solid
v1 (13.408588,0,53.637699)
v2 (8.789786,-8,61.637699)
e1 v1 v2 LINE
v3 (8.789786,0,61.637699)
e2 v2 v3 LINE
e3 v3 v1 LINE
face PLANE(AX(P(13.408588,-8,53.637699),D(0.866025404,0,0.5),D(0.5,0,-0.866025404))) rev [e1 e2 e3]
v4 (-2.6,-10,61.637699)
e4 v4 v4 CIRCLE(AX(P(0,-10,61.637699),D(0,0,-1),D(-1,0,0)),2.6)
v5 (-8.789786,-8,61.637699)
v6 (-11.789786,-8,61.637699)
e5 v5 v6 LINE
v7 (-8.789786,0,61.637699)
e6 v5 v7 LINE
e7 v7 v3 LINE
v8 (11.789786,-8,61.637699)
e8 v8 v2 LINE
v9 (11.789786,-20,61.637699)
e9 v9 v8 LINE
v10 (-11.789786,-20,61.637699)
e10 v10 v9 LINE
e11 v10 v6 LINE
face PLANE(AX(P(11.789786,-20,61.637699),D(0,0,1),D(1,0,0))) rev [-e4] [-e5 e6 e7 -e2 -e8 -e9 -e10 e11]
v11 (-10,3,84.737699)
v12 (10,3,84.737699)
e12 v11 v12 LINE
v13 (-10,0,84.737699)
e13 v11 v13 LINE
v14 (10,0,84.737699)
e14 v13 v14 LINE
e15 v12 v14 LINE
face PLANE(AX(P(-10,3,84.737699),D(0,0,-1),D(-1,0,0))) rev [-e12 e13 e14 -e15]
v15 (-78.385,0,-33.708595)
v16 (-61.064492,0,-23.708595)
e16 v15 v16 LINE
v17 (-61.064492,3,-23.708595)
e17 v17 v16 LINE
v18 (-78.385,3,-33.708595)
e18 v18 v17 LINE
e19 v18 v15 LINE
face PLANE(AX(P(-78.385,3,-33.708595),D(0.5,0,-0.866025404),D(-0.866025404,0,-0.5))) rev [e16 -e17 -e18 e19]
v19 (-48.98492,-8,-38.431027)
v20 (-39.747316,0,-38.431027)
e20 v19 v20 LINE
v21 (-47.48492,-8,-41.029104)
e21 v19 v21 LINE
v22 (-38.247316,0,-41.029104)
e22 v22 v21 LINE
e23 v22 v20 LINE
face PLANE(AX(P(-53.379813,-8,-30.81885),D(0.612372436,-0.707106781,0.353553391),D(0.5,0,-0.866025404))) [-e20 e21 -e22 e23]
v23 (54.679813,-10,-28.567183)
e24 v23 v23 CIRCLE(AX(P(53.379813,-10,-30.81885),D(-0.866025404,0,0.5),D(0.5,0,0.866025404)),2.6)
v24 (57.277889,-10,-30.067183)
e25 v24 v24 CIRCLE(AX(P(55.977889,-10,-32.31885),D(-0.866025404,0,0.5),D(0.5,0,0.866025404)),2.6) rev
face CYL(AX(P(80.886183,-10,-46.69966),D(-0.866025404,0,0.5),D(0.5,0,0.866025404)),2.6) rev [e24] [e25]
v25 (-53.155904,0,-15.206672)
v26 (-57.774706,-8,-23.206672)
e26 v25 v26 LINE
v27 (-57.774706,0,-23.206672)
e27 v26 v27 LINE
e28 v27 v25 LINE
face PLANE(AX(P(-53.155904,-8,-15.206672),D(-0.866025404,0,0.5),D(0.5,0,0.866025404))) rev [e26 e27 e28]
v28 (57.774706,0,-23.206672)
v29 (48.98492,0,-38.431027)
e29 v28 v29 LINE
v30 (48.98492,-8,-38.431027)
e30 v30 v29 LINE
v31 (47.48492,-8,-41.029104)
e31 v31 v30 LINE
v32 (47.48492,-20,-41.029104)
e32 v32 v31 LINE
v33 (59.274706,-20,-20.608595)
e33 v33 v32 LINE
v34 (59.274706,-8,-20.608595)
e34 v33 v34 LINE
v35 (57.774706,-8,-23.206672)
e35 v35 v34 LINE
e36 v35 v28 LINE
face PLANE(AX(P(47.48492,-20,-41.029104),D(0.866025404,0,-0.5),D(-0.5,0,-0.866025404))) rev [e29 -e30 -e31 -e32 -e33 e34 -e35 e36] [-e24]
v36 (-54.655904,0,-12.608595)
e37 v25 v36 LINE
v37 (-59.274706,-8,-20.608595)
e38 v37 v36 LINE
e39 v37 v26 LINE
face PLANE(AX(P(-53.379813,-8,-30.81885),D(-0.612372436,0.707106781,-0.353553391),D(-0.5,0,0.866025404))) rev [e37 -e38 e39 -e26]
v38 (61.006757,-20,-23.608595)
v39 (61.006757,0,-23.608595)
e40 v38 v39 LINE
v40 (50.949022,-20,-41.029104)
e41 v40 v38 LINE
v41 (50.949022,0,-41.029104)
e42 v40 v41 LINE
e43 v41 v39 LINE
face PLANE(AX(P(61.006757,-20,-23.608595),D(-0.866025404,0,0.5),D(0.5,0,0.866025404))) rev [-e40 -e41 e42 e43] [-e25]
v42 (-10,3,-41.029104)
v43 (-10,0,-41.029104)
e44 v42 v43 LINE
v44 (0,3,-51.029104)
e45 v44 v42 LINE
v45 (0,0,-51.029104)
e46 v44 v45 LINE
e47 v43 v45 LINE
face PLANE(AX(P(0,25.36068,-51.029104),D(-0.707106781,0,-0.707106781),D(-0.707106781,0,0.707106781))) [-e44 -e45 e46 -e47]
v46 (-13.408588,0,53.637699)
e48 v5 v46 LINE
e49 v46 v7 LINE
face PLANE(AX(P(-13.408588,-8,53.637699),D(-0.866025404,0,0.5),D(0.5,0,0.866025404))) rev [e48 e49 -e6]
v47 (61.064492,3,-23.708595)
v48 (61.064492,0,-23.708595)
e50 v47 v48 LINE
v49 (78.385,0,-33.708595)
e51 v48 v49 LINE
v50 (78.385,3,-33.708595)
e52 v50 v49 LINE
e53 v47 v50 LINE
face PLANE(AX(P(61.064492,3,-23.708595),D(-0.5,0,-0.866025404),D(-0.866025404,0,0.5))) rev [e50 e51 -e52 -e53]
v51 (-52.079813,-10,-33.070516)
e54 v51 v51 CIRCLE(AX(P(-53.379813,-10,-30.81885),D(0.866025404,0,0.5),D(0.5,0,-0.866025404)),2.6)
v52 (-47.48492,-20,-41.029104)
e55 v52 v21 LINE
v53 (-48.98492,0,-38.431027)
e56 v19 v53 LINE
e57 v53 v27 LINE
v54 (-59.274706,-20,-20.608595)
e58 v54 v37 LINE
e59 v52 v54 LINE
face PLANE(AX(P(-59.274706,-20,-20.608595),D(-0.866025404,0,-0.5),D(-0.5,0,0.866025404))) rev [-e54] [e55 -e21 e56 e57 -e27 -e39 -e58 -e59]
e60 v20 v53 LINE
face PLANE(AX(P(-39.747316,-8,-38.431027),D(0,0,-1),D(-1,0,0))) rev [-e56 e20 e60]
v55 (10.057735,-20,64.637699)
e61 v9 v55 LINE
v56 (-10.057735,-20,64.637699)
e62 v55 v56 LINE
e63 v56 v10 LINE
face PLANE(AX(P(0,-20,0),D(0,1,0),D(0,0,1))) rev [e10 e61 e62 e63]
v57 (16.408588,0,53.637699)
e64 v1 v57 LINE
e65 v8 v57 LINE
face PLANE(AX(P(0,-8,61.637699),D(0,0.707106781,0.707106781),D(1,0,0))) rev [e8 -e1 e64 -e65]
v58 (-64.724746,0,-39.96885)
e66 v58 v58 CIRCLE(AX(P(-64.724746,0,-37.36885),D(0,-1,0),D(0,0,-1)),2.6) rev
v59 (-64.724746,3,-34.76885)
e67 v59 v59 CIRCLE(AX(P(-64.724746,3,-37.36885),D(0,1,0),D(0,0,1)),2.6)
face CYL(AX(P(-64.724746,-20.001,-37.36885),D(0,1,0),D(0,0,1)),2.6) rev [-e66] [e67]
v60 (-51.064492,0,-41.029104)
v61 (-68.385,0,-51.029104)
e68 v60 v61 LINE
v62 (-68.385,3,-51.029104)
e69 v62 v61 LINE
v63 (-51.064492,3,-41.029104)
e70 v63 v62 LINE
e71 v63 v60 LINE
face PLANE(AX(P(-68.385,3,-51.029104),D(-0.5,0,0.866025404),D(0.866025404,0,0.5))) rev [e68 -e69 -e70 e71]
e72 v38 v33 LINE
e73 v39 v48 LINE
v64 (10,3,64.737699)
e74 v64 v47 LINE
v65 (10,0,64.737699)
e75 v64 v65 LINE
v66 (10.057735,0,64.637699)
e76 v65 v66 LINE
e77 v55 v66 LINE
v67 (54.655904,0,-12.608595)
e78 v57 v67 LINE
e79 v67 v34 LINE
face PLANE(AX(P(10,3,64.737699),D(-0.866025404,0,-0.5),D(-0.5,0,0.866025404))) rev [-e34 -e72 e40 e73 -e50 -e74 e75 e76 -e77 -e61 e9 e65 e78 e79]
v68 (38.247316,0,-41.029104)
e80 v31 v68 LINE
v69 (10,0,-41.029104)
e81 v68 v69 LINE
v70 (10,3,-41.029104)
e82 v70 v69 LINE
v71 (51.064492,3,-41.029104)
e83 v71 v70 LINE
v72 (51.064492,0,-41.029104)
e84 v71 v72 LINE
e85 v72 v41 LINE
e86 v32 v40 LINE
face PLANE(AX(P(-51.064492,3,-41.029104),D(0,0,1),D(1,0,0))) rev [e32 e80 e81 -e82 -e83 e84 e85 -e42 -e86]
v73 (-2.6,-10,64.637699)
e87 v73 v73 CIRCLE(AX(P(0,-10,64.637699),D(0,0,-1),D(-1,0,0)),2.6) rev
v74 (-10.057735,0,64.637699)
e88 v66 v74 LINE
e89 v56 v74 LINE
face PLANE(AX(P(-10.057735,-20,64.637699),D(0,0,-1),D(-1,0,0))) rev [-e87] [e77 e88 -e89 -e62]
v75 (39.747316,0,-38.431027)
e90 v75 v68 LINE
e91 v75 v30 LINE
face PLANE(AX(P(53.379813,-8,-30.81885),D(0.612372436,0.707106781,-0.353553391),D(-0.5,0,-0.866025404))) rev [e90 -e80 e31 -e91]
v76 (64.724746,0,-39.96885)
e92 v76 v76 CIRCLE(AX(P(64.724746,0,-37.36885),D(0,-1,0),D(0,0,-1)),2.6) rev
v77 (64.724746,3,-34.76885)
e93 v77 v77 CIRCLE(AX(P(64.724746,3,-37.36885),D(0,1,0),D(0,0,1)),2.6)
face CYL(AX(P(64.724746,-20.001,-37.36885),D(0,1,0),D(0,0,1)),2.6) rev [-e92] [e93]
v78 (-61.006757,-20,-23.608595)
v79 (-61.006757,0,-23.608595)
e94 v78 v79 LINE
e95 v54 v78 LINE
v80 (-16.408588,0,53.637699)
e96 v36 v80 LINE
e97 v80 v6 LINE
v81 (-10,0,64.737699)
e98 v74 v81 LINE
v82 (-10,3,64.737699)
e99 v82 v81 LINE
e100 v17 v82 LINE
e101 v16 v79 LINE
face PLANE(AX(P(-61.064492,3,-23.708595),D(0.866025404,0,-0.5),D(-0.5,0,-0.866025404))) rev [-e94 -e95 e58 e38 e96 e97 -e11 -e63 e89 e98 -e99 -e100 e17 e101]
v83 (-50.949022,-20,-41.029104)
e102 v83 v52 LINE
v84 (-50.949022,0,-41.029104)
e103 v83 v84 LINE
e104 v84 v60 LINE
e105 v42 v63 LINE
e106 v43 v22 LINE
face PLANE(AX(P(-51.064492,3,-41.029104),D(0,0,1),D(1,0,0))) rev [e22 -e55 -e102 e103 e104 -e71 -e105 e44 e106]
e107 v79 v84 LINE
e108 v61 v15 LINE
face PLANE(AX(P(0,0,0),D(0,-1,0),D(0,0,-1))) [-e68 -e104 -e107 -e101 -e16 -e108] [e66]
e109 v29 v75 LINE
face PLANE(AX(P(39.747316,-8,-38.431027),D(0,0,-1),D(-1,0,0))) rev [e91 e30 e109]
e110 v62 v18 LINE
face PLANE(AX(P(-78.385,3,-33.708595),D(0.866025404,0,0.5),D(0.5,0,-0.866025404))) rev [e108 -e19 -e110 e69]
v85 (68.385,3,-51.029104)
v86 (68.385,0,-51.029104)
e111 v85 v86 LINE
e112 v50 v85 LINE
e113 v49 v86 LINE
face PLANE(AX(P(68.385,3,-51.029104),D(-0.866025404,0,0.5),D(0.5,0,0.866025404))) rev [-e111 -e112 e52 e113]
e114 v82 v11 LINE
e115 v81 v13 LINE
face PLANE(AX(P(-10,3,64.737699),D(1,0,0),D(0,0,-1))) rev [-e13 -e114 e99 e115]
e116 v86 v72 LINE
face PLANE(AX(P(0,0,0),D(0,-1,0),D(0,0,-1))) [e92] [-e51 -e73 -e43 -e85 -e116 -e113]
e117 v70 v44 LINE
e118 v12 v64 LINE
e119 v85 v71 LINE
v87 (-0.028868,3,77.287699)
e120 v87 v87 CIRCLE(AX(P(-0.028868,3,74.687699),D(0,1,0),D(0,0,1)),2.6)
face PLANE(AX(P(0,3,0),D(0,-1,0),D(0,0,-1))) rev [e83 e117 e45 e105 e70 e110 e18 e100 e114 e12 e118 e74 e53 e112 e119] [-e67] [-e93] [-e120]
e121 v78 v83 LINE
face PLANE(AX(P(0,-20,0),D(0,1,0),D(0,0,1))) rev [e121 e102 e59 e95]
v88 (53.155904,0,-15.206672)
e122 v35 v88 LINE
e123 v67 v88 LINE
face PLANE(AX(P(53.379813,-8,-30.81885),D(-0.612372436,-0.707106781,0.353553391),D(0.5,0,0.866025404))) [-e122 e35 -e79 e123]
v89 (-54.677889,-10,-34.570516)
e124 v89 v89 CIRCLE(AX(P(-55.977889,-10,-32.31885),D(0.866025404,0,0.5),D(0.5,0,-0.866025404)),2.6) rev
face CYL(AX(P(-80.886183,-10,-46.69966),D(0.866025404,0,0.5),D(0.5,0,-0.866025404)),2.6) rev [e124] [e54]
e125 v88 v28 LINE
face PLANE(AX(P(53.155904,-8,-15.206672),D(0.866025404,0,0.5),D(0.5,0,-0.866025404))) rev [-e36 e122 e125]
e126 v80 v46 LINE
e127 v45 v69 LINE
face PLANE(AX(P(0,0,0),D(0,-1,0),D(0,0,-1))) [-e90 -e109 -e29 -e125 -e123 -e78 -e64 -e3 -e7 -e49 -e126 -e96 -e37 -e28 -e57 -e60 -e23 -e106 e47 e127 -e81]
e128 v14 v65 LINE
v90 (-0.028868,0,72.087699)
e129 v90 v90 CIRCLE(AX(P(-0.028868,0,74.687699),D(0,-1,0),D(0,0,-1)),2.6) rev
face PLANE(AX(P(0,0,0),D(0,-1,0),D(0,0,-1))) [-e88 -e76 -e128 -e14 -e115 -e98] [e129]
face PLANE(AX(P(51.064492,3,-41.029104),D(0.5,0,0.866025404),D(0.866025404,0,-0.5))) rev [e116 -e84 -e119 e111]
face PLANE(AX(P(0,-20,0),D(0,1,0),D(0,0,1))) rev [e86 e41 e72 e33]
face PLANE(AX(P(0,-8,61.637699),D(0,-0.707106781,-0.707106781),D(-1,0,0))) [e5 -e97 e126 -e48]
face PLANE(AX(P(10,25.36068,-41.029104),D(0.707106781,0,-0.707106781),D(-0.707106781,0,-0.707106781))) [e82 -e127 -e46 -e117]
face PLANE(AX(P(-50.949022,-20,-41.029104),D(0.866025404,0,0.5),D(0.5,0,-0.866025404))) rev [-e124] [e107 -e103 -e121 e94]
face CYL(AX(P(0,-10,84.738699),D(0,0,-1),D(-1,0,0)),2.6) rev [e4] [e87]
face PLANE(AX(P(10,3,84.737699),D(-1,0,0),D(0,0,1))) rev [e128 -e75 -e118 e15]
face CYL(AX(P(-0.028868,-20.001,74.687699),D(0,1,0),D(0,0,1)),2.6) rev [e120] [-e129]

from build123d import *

# Parameters (mm, degrees)
AUFSATZ_LINEAR_AUSTRAGEN1_DEPTH = 3
AUFSATZ_LINEAR_AUSTRAGEN3_DEPTH = 3
AUFSATZ_LINEAR_AUSTRAGEN2_DEPTH = 20
AUFSATZ_LINEAR_AUSTRAGEN4_DEPTH = 8
FASE1_SIZE                      = 8
SCHNITT_LINEAR_AUSTRAGEN1_REACH = 119.702
SKIZZE5_R                       = 2.6
SCHNITT_LINEAR_AUSTRAGEN2_REACH = 178.395
SKIZZE6_R                       = 2.6
SCHNITT_LINEAR_AUSTRAGEN3_REACH = 178.395
SKIZZE7_R                       = 2.6
SCHNITT_LINEAR_AUSTRAGEN4_REACH = 140.701
SKIZZE8_R                       = 2.6


with BuildPart() as part:
    # Skizze1 → Aufsatz-Linear austragen1 (new body)
    with BuildSketch(Plane(origin=(0, 0, 0), x_dir=(1, 0, 0), z_dir=(0, 1, 0))):
        Polygon((-10, -84.737699009), (10, -84.737699009), (10, -64.737699009), (61.064491924, 23.708595467), (78.385, 33.708595467), (68.385, 51.029103542), (51.064491924, 41.029103542), (-51.064491924, 41.029103542), (-68.385, 51.029103542), (-78.385, 33.708595467), (-61.064491924, 23.708595467), (-10, -64.737699009), align=None)
    extrude(amount=AUFSATZ_LINEAR_AUSTRAGEN1_DEPTH)

    # Skizze3 → Aufsatz-Linear austragen3 (add)
    with BuildSketch(Plane.XZ):
        Polygon((0, -51.029103542), (-10, -41.029103542), (10, -41.029103542), align=None)
    extrude(amount=-AUFSATZ_LINEAR_AUSTRAGEN3_DEPTH)

    # Skizze2 → Aufsatz-Linear austragen2 (add)
    with BuildSketch(Plane.XZ):
        Polygon((-10.057735027, 64.637699009), (10.057735027, 64.637699009), (11.789785834, 61.637699009), (-11.789785834, 61.637699009), align=None)
        Polygon((61.006756897, -23.608595467), (50.94902187, -41.029103542), (47.484920255, -41.029103542), (59.27470609, -20.608595467), align=None)
        Polygon((-50.94902187, -41.029103542), (-61.006756897, -23.608595467), (-59.27470609, -20.608595467), (-47.484920255, -41.029103542), align=None)
    extrude(amount=AUFSATZ_LINEAR_AUSTRAGEN2_DEPTH)

    # Skizze4 → Aufsatz-Linear austragen4 (add)
    with BuildSketch(Plane.XZ):
        Polygon((-11.789785834, 61.637699009), (-16.408587988, 53.637699009), (-13.408587988, 53.637699009), (-8.789785834, 61.637699009), align=None)
        Polygon((11.789785834, 61.637699009), (8.789785834, 61.637699009), (13.408587988, 53.637699009), (16.408587988, 53.637699009), align=None)
        Polygon((59.27470609, -20.608595467), (54.655903936, -12.608595467), (53.155903936, -15.206671678), (57.77470609, -23.206671678), align=None)
        Polygon((47.484920255, -41.029103542), (48.984920255, -38.431027331), (39.747315948, -38.431027331), (38.247315948, -41.029103542), align=None)
        Polygon((-47.484920255, -41.029103542), (-38.247315948, -41.029103542), (-39.747315948, -38.431027331), (-48.984920255, -38.431027331), align=None)
        Polygon((-59.27470609, -20.608595467), (-57.77470609, -23.206671678), (-53.155903936, -15.206671678), (-54.655903936, -12.608595467), align=None)
    extrude(amount=AUFSATZ_LINEAR_AUSTRAGEN4_DEPTH)

    # Fase1
    # the kernel refuses this chamfer: 8 mm, written as the material it takes off along each edge
    with BuildSketch(Plane(origin=(-42.869171984, -8, -33.023814062), x_dir=(0.023812127644089447, 0.9996219169112968, 0.013747938305292782), z_dir=(-0.5000000000000003, 0, 0.8660254037844386))) as fase1_piece_1_section:
        Polygon((FASE1_SIZE * 0.999621916911, FASE1_SIZE * 0.0274958766106), (-FASE1_SIZE * 0.0274958766106, FASE1_SIZE * 0.999621916911), (0, 0), align=None)
    fase1_piece_1 = extrude(amount=44.146927807, mode=Mode.PRIVATE)
    fase1_piece_1 = split(fase1_piece_1, bisect_by=Plane(origin=(-56.186972779, 0, -15.224609283), z_dir=(0, -1, 0)), keep=Keep.TOP, mode=Mode.PRIVATE)
    add(fase1_piece_1, mode=Mode.SUBTRACT)
    with BuildSketch(Plane(origin=(-27.960583996, -8, -58.846245927), x_dir=(0.02381212764409005, 0.9996219169112968, 0.013747938305293118), z_dir=(-0.5, 0, 0.8660254037844387))) as fase1_piece_2_section:
        Polygon((FASE1_SIZE * 0.999621916911, FASE1_SIZE * 0.0274958766106), (-FASE1_SIZE * 0.0274958766106, FASE1_SIZE * 0.999621916911), (0, 0), align=None)
    fase1_piece_2 = extrude(amount=44.146927807, mode=Mode.PRIVATE)
    fase1_piece_2 = split(fase1_piece_2, bisect_by=Plane(origin=(-41.278384791, 0, -41.047041147), z_dir=(0, -1, 0)), keep=Keep.TOP, mode=Mode.PRIVATE)
    add(fase1_piece_2, mode=Mode.SUBTRACT)
    with BuildSketch(Plane(origin=(50.0340479, -8, -20.613884946), x_dir=(-0.023812127644090117, 0.9996219169112968, 0.013747938305293118), z_dir=(-0.49999999999999895, 0, -0.8660254037844393))) as fase1_piece_3_section:
        Polygon((FASE1_SIZE * 0.999621916911, FASE1_SIZE * 0.0274958766106), (-FASE1_SIZE * 0.0274958766106, FASE1_SIZE * 0.999621916911), (0, 0), align=None)
    fase1_piece_3 = extrude(amount=44.146927807, mode=Mode.PRIVATE)
    fase1_piece_3 = split(fase1_piece_3, bisect_by=Plane(origin=(41.278384791, 0, -41.047041147), z_dir=(0, -1, 0)), keep=Keep.TOP, mode=Mode.PRIVATE)
    add(fase1_piece_3, mode=Mode.SUBTRACT)
    with BuildSketch(Plane(origin=(64.942635888, -8, 5.208546918), x_dir=(-0.023812127644090537, 0.9996219169112968, 0.013747938305293455), z_dir=(-0.5000000000000016, 0, -0.8660254037844378))) as fase1_piece_4_section:
        Polygon((FASE1_SIZE * 0.999621916911, FASE1_SIZE * 0.0274958766106), (-FASE1_SIZE * 0.0274958766106, FASE1_SIZE * 0.999621916911), (0, 0), align=None)
    fase1_piece_4 = extrude(amount=44.146927807, mode=Mode.PRIVATE)
    fase1_piece_4 = split(fase1_piece_4, bisect_by=Plane(origin=(56.186972779, 0, -15.224609283), z_dir=(0, -1, 0)), keep=Keep.TOP, mode=Mode.PRIVATE)
    add(fase1_piece_4, mode=Mode.SUBTRACT)
    with BuildSketch(Plane(origin=(-7.164875916, -8, 53.637699009), x_dir=(0, -0.02749587661058627, 0.9996219169112968), z_dir=(1, 0, 0))) as fase1_piece_5_section:
        Polygon((FASE1_SIZE * 0.999621916911, -FASE1_SIZE * 0.0274958766106), (-FASE1_SIZE * 0.0274958766106, -FASE1_SIZE * 0.999621916911), (0, 0), align=None)
    fase1_piece_5 = extrude(amount=44.146927807, mode=Mode.PRIVATE)
    fase1_piece_5 = split(fase1_piece_5, bisect_by=Plane(origin=(14.908587988, 0, 61.735979971), z_dir=(0, -1, 0)), keep=Keep.TOP, mode=Mode.PRIVATE)
    add(fase1_piece_5, mode=Mode.SUBTRACT)
    with BuildSketch(Plane(origin=(-36.982051892, -8, 53.637699009), x_dir=(0, 0.9996219169112968, -0.027495876610586494), z_dir=(1, 0, 0))) as fase1_piece_6_section:
        Polygon((FASE1_SIZE * 0.999621916911, FASE1_SIZE * 0.0274958766106), (-FASE1_SIZE * 0.0274958766106, FASE1_SIZE * 0.999621916911), (0, 0), align=None)
    fase1_piece_6 = extrude(amount=44.146927807, mode=Mode.PRIVATE)
    fase1_piece_6 = split(fase1_piece_6, bisect_by=Plane(origin=(-14.908587988, 0, 56.27165043), z_dir=(0, -1, 0)), keep=Keep.TOP, mode=Mode.PRIVATE)
    add(fase1_piece_6, mode=Mode.SUBTRACT)

    # Skizze5 → Schnitt-Linear austragen1 (cut, up to next)
    with BuildSketch(Plane(origin=(0, 3, 0), x_dir=(1, 0, 0), z_dir=(0, 1, 0)), mode=Mode.PRIVATE) as schnitt_linear_austragen1_sk1:
        with Locations(Location((-64.724745962, 37.368849504, 0), (0, 0, 270))):
            Circle(SKIZZE5_R)
    schnitt_linear_austragen1_tool1 = extrude(schnitt_linear_austragen1_sk1.sketch, amount=-SCHNITT_LINEAR_AUSTRAGEN1_REACH, mode=Mode.PRIVATE) & part.part
    # Skizze5 → Schnitt-Linear austragen1 (cut, up to next)
    with BuildSketch(Plane(origin=(0, 3, 0), x_dir=(1, 0, 0), z_dir=(0, 1, 0)), mode=Mode.PRIVATE) as schnitt_linear_austragen1_sk2:
        with Locations(Location((64.724745962, 37.368849504, 0), (0, 0, 270))):
            Circle(SKIZZE5_R)
    schnitt_linear_austragen1_tool2 = extrude(schnitt_linear_austragen1_sk2.sketch, amount=-SCHNITT_LINEAR_AUSTRAGEN1_REACH, mode=Mode.PRIVATE) & part.part
    # Skizze5 → Schnitt-Linear austragen1 (cut, up to next)
    with BuildSketch(Plane(origin=(0, 3, 0), x_dir=(1, 0, 0), z_dir=(0, 1, 0)), mode=Mode.PRIVATE) as schnitt_linear_austragen1_sk3:
        with Locations(Location((-0.028867513, -74.687699009, 0), (0, 0, 270))):
            Circle(SKIZZE5_R)
    schnitt_linear_austragen1_tool3 = extrude(schnitt_linear_austragen1_sk3.sketch, amount=-SCHNITT_LINEAR_AUSTRAGEN1_REACH, mode=Mode.PRIVATE) & part.part
    add(schnitt_linear_austragen1_tool1.solids().sort_by_distance((-64.724746, 3, -37.36885))[0], mode=Mode.SUBTRACT)
    add(schnitt_linear_austragen1_tool2.solids().sort_by_distance((64.724746, 3, -37.36885))[0], mode=Mode.SUBTRACT)
    add(schnitt_linear_austragen1_tool3.solids().sort_by_distance((-0.028868, 3, 74.687699))[0], mode=Mode.SUBTRACT)

    # Skizze6 → Schnitt-Linear austragen2 (cut, up to next)
    with BuildSketch(Plane(origin=(53.379813173, 0, -30.818849504), x_dir=(0.49999999999999967, 0, 0.8660254037844389), z_dir=(-0.8660254037844389, 0, 0.49999999999999967)), mode=Mode.PRIVATE) as schnitt_linear_austragen2_sk1:
        with Locations((0, -10)):
            Circle(SKIZZE6_R)
    schnitt_linear_austragen2_tool1 = extrude(schnitt_linear_austragen2_sk1.sketch, amount=-SCHNITT_LINEAR_AUSTRAGEN2_REACH, mode=Mode.PRIVATE) & part.part
    add(schnitt_linear_austragen2_tool1.solids().sort_by_distance((53.379813, -10, -30.81885))[0], mode=Mode.SUBTRACT)

    # Skizze7 → Schnitt-Linear austragen3 (cut, up to next)
    with BuildSketch(Plane(origin=(-53.379813173, 0, -30.818849504), x_dir=(0.5000000000000007, 0, -0.8660254037844383), z_dir=(0.8660254037844383, 0, 0.5000000000000007)), mode=Mode.PRIVATE) as schnitt_linear_austragen3_sk1:
        with Locations((0, -10)):
            Circle(SKIZZE7_R)
    schnitt_linear_austragen3_tool1 = extrude(schnitt_linear_austragen3_sk1.sketch, amount=-SCHNITT_LINEAR_AUSTRAGEN3_REACH, mode=Mode.PRIVATE) & part.part
    add(schnitt_linear_austragen3_tool1.solids().sort_by_distance((-53.379813, -10, -30.81885))[0], mode=Mode.SUBTRACT)

    # Skizze8 → Schnitt-Linear austragen4 (cut, up to next)
    with BuildSketch(Plane(origin=(0, 0, 61.637699009), x_dir=(-1, 0, 0), z_dir=(0, 0, -1)), mode=Mode.PRIVATE) as schnitt_linear_austragen4_sk1:
        with Locations((0, -10)):
            Circle(SKIZZE8_R)
    schnitt_linear_austragen4_tool1 = extrude(schnitt_linear_austragen4_sk1.sketch, amount=-SCHNITT_LINEAR_AUSTRAGEN4_REACH, mode=Mode.PRIVATE) & part.part
    add(schnitt_linear_austragen4_tool1.solids().sort_by_distance((0, -10, 61.637699))[0], mode=Mode.SUBTRACT)


solid = part.part
